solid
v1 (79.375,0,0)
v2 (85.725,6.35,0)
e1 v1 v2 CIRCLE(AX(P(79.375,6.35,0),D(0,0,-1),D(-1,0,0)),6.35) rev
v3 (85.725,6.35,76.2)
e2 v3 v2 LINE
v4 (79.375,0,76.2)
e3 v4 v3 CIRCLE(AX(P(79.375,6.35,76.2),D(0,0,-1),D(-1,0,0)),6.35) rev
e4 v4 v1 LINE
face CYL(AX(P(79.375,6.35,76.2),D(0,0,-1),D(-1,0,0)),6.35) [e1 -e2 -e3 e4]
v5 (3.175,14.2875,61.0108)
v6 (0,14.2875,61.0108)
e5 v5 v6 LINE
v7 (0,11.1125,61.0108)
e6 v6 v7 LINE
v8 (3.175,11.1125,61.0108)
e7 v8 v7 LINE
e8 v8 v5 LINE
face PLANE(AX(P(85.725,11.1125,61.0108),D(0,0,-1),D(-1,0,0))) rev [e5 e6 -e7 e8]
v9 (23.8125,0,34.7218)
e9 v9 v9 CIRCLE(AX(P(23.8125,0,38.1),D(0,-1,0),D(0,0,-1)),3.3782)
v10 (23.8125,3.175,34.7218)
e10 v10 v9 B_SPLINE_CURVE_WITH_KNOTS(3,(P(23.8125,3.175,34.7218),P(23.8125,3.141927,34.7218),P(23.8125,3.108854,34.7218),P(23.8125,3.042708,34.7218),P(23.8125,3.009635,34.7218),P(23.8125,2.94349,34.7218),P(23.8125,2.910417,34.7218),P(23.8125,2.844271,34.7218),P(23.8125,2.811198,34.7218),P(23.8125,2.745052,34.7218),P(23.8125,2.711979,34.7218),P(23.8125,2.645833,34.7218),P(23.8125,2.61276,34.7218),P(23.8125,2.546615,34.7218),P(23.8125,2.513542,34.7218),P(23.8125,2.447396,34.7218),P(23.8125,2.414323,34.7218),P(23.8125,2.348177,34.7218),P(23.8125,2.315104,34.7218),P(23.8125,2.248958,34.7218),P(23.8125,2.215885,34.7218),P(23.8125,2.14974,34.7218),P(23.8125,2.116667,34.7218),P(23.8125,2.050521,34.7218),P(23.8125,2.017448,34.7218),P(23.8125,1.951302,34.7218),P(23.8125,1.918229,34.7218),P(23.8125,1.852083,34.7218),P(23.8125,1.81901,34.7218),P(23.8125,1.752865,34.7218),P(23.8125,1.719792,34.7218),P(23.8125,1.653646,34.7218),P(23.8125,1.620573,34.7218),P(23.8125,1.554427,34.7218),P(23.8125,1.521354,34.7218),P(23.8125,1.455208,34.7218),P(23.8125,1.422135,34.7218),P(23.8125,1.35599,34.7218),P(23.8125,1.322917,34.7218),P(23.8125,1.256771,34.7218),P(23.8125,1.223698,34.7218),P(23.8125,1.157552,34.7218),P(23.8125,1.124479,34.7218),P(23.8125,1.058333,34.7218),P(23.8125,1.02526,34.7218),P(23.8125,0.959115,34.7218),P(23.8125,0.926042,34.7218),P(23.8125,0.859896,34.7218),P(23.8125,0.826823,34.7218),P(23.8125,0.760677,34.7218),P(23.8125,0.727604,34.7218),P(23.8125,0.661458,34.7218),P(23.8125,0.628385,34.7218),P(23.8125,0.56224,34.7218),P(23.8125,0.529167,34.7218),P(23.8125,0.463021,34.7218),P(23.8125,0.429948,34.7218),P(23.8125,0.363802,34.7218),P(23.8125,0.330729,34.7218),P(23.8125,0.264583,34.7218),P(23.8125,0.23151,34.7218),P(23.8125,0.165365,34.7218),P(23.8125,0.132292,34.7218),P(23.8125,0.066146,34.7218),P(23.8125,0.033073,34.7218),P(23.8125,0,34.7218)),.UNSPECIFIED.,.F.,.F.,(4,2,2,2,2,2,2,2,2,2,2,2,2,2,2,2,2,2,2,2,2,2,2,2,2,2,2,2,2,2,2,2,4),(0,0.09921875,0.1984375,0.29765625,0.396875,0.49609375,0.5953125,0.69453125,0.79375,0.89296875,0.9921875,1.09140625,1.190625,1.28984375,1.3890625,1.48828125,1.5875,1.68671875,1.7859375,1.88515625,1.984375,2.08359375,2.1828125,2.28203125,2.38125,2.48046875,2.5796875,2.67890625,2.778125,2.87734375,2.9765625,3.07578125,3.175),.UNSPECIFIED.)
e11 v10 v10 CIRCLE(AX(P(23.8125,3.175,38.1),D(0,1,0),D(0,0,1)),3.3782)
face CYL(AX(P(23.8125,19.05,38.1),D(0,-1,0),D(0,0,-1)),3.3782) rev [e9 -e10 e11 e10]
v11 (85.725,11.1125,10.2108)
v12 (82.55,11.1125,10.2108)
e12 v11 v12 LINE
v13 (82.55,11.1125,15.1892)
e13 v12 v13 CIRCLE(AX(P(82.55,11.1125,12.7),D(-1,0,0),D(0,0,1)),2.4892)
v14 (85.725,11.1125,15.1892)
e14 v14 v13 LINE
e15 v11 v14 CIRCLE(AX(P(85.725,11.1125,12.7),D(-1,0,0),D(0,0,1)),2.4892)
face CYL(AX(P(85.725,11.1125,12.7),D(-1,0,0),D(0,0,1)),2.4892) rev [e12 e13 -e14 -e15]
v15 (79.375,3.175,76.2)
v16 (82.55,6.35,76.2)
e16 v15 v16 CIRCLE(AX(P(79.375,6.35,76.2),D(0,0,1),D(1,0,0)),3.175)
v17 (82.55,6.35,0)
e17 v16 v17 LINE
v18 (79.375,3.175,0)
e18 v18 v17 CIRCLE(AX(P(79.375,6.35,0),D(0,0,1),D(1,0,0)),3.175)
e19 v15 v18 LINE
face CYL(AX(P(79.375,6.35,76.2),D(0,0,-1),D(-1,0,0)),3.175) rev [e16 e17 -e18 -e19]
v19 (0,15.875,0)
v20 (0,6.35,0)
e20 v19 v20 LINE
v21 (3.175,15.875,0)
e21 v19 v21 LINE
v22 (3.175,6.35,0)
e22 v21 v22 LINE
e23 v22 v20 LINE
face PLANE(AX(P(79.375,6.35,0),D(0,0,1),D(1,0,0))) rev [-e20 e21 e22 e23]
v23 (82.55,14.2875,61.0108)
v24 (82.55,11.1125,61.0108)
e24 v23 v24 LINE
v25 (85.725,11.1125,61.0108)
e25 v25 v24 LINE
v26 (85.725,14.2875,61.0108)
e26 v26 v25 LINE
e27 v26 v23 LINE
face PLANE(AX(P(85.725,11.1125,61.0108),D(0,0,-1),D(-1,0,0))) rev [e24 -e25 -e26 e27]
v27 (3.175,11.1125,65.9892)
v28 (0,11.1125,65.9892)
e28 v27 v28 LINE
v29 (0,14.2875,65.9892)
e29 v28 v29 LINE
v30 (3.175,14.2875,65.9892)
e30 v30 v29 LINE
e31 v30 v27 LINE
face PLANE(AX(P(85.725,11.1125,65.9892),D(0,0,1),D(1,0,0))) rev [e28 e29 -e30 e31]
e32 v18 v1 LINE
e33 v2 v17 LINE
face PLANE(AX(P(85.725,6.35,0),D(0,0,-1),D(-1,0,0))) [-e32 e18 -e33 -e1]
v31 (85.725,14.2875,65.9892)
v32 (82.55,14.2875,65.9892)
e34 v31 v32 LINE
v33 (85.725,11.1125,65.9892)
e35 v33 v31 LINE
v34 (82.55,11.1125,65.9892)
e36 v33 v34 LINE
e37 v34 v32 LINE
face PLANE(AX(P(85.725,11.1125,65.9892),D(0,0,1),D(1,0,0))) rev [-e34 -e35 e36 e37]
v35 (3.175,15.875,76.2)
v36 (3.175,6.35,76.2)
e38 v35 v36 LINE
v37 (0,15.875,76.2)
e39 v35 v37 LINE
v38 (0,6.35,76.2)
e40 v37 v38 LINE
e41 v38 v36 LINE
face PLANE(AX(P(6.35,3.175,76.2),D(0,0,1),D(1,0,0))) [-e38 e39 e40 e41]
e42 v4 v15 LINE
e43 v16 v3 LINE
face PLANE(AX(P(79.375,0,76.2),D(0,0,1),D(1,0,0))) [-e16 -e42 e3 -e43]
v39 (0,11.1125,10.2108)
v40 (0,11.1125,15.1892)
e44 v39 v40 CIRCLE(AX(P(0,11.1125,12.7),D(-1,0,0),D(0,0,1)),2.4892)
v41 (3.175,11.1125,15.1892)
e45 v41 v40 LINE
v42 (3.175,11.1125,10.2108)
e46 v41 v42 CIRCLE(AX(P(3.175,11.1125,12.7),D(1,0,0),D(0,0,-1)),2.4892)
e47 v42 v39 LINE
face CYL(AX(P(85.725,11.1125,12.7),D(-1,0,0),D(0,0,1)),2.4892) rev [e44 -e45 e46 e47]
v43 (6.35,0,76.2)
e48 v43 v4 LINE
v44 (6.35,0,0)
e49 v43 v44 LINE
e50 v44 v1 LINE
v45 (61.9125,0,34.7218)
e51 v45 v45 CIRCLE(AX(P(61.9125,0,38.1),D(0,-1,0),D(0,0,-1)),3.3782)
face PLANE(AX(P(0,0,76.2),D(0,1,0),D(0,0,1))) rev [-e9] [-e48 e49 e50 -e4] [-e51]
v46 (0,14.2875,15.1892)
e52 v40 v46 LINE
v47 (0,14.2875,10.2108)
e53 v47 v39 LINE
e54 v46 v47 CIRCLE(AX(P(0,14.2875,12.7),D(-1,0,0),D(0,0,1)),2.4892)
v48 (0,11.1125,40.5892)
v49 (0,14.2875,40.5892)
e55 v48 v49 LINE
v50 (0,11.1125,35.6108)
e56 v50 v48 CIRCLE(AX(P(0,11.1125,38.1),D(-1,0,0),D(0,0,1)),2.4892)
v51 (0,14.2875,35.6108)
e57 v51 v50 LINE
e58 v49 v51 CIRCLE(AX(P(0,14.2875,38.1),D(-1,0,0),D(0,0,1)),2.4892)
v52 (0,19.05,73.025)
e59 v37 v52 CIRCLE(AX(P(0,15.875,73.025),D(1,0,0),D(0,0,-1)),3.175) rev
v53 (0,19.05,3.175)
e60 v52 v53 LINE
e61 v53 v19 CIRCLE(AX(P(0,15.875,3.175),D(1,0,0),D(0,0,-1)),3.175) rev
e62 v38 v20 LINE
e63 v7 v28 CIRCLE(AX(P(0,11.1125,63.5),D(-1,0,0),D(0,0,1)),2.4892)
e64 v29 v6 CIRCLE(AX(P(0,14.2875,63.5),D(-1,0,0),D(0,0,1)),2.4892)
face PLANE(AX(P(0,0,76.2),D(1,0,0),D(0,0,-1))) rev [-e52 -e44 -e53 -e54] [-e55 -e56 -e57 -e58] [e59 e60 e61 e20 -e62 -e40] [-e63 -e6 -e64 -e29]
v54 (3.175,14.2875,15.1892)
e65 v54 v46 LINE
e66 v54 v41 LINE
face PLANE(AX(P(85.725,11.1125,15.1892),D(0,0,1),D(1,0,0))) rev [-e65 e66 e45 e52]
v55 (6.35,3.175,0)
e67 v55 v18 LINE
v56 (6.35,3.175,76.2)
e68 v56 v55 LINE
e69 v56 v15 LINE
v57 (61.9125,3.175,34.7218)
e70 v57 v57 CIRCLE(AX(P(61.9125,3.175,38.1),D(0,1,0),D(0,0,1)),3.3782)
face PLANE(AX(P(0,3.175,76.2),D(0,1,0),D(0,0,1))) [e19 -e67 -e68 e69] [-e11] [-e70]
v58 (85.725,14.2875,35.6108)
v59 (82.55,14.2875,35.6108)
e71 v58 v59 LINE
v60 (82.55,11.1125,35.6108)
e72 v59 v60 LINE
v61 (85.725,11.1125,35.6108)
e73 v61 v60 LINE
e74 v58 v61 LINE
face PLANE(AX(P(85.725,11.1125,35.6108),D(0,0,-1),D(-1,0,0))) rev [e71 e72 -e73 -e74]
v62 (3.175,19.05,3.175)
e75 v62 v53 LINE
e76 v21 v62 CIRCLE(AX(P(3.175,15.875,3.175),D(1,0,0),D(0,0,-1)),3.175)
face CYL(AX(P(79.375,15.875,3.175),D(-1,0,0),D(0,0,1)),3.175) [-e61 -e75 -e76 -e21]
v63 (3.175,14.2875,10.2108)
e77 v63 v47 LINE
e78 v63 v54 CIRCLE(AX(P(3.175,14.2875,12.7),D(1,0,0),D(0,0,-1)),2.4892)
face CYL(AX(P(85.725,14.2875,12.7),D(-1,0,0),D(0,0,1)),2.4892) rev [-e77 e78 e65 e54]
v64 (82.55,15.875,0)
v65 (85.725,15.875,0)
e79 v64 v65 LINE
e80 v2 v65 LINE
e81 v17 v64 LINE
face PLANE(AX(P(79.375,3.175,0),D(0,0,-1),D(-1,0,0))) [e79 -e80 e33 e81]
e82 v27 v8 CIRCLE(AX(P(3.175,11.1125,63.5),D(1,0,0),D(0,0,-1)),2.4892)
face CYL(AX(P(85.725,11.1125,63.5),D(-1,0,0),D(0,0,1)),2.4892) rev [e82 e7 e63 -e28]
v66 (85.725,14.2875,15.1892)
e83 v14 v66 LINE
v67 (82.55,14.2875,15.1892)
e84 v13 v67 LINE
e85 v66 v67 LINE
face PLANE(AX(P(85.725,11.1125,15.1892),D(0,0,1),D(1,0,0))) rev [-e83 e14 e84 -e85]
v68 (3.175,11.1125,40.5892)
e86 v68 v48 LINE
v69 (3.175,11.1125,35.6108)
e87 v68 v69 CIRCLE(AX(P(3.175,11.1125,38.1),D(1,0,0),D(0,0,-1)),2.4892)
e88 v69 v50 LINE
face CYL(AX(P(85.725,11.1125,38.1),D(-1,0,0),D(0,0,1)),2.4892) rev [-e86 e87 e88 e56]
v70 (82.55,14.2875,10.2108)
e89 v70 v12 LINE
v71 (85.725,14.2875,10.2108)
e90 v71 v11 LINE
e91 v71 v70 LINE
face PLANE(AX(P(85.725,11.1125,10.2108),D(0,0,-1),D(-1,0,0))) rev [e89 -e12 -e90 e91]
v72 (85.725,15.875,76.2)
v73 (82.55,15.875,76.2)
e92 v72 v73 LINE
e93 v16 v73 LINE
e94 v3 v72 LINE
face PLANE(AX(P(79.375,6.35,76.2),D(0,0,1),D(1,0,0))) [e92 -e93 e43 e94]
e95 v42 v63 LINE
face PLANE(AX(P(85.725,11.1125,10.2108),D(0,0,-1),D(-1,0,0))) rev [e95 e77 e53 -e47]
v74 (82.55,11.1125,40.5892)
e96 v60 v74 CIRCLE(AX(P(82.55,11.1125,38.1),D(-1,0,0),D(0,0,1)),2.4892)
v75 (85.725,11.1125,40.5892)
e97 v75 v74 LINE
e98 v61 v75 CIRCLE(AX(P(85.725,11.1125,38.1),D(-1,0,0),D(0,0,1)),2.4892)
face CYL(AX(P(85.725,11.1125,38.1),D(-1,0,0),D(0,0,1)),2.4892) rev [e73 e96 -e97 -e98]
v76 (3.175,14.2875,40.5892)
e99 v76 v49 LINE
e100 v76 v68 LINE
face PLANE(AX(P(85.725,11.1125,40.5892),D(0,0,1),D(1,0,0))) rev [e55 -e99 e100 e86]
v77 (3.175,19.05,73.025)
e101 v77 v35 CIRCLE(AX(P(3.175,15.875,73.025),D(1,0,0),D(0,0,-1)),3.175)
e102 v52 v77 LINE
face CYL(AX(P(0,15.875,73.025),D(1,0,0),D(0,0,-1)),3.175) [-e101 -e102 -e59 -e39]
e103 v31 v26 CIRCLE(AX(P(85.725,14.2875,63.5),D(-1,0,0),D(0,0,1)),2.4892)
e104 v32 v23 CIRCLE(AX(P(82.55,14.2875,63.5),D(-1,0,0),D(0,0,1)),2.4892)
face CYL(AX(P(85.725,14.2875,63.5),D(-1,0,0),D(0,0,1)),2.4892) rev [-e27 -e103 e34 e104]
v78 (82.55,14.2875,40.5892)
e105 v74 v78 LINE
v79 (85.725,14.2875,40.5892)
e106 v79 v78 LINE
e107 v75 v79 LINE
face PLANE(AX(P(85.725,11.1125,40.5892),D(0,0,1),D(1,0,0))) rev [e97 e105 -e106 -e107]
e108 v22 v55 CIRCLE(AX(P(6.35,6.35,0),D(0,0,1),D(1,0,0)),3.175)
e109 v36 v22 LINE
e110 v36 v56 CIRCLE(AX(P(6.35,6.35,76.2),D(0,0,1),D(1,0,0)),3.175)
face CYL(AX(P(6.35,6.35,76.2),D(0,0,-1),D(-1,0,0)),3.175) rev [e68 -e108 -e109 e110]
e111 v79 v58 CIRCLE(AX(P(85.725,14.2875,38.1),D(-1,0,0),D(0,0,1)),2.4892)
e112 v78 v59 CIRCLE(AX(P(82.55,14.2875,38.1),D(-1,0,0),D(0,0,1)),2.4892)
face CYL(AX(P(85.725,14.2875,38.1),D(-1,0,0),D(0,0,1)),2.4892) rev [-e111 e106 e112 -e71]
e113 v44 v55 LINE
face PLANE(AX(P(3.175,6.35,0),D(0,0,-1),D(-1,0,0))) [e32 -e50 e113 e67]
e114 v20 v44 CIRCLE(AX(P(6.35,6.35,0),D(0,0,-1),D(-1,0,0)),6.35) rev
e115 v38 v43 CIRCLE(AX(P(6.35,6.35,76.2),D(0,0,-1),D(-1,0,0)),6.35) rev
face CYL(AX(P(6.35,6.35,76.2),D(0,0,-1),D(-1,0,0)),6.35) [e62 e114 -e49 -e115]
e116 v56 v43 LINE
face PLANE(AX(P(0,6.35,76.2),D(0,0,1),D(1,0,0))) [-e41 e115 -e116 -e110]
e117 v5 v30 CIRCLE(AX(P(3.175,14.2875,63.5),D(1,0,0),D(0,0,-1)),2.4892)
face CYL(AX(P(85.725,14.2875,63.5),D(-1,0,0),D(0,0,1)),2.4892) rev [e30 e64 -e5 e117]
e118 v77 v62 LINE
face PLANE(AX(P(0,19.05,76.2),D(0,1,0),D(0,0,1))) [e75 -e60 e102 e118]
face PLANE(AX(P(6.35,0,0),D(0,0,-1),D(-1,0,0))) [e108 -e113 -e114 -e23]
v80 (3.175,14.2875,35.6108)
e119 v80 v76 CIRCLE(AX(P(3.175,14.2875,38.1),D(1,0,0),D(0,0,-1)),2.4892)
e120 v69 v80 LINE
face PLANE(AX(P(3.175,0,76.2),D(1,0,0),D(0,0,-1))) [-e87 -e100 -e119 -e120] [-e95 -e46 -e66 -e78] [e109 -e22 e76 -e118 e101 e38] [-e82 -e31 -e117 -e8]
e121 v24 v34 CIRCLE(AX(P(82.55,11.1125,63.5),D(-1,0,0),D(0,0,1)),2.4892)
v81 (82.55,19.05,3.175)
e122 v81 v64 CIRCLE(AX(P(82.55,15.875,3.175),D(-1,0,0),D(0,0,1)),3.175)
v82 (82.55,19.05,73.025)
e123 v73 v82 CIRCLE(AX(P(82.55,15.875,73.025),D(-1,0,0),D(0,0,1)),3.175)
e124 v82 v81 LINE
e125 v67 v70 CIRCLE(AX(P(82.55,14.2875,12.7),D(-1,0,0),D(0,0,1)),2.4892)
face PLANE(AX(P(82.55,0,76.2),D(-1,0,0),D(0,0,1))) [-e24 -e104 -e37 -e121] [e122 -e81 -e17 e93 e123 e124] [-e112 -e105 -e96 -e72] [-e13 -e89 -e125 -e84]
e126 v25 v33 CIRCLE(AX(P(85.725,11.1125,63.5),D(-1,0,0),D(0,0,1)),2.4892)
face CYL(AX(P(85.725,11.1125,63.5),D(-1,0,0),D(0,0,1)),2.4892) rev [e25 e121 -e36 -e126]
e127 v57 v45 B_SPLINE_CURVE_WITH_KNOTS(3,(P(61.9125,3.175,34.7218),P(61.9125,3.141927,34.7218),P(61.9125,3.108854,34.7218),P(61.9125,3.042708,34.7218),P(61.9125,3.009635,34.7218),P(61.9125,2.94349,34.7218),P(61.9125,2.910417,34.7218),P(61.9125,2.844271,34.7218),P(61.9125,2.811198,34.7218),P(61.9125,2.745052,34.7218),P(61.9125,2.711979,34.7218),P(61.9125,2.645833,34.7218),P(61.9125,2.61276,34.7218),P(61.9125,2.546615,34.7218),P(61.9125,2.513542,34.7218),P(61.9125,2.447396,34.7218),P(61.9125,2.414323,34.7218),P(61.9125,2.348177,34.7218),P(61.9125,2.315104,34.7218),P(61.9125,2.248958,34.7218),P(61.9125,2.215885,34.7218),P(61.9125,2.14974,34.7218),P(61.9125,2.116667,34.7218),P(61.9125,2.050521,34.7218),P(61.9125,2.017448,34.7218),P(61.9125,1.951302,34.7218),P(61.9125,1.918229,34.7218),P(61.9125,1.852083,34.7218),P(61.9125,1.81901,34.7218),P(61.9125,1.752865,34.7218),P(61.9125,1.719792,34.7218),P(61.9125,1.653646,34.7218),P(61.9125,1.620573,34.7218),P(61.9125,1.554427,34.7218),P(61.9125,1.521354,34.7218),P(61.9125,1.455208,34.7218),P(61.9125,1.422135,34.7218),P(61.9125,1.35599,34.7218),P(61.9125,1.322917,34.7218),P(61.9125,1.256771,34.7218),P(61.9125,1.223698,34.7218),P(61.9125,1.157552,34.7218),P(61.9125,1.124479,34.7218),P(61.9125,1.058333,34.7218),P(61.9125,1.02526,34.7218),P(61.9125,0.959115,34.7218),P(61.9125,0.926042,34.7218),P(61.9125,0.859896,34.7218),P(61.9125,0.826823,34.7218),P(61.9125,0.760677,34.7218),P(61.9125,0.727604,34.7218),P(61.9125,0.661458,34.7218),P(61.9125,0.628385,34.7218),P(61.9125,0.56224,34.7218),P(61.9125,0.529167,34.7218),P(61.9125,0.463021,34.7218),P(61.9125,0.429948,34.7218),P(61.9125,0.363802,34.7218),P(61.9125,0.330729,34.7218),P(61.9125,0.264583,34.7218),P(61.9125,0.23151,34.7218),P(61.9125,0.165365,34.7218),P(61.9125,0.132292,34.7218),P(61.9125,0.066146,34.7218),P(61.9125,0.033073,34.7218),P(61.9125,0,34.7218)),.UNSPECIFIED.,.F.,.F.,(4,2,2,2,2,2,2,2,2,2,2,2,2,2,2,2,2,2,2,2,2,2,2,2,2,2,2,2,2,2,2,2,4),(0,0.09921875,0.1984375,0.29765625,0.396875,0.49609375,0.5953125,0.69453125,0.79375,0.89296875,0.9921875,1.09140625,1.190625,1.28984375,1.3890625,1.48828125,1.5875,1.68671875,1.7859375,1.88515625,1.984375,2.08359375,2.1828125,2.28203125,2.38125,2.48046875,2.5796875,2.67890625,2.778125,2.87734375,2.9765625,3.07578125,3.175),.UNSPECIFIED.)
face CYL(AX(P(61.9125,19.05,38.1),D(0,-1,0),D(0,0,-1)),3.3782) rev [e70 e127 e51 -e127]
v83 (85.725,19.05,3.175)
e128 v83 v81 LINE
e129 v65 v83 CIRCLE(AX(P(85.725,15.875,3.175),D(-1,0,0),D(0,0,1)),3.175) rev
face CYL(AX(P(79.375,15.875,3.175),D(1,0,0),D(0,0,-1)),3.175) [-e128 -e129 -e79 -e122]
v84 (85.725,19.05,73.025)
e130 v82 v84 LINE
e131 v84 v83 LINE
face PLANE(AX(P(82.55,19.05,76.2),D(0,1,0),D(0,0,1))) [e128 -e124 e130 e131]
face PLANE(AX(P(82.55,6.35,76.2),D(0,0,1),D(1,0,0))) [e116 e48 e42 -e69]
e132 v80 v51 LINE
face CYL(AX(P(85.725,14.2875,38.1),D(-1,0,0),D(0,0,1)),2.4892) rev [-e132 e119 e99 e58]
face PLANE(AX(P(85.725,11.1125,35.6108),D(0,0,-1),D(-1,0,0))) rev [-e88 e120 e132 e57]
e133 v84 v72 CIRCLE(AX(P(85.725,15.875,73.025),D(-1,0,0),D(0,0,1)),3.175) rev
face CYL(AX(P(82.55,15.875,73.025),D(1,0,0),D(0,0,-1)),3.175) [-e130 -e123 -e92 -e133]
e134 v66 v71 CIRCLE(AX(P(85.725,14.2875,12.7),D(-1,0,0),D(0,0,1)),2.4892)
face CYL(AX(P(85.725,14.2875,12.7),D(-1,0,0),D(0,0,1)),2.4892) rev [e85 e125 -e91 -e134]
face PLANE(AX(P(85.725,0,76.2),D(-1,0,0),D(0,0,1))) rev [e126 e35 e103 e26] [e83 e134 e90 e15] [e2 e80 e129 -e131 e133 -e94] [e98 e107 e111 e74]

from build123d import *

# Parameters (mm, degrees)
BASE_FLANGE1_DEPTH = 76.2
CUT_EXTRUDE1_DEPTH = 117.26744224
SKETCH7_R          = 3.3782
CUT_EXTRUDE2_DEPTH = 117.26744224
FILLET1_R          = 3.175


# Sheet-metal steps are written as plain solids
with BuildPart() as part:
    # Sketch1 → Base-Flange1 (new body)
    with BuildSketch(Plane.XY):
        with BuildLine():
            Line((85.725, 19.05), (85.725, 6.35))
            ThreePointArc((85.725, 6.35), (83.865128061, 1.859871939), (79.375, 0))
            Line((79.375, 0), (6.35, 0))
            ThreePointArc((6.35, 0), (1.859871939, 1.859871939), (0, 6.35))
            Line((0, 6.35), (0, 19.05))
            Line((0, 19.05), (3.175, 19.05))
            Line((3.175, 19.05), (3.175, 6.35))
            ThreePointArc((3.175, 6.35), (4.10493597, 4.10493597), (6.35, 3.175))
            Line((6.35, 3.175), (79.375, 3.175))
            ThreePointArc((79.375, 3.175), (81.62006403, 4.10493597), (82.55, 6.35))
            Line((82.55, 6.35), (82.55, 19.05))
            Line((82.55, 19.05), (85.725, 19.05))
        make_face()
    extrude(amount=BASE_FLANGE1_DEPTH)

    # Sketch6 → Cut-Extrude1 (cut, through all)
    with BuildSketch(Plane.ZY):
        with BuildLine():
            Line((35.6108, 11.1125), (35.6108, 14.2875))
            ThreePointArc((35.6108, 14.2875), (38.1, 16.7767), (40.5892, 14.2875))
            Line((40.5892, 14.2875), (40.5892, 11.1125))
            ThreePointArc((40.5892, 11.1125), (38.1, 8.6233), (35.6108, 11.1125))
        make_face()
        with BuildLine():
            Line((10.2108, 11.1125), (10.2108, 14.2875))
            ThreePointArc((10.2108, 14.2875), (12.7, 16.7767), (15.1892, 14.2875))
            Line((15.1892, 14.2875), (15.1892, 11.1125))
            ThreePointArc((15.1892, 11.1125), (12.7, 8.6233), (10.2108, 11.1125))
        make_face()
        with BuildLine():
            Line((61.0108, 11.1125), (61.0108, 14.2875))
            ThreePointArc((61.0108, 14.2875), (63.5, 16.7767), (65.9892, 14.2875))
            Line((65.9892, 14.2875), (65.9892, 11.1125))
            ThreePointArc((65.9892, 11.1125), (63.5, 8.6233), (61.0108, 11.1125))
        make_face()
    extrude(amount=-CUT_EXTRUDE1_DEPTH, mode=Mode.SUBTRACT)

    # Sketch7 → Cut-Extrude2 (cut, through all)
    with BuildSketch(Plane.XZ):
        with Locations(Location((61.9125, 38.1, 0), (0, 0, 270))):
            Circle(SKETCH7_R)
        with Locations(Location((23.8125, 38.1, 0), (0, 0, 270))):
            Circle(SKETCH7_R)
    extrude(amount=-CUT_EXTRUDE2_DEPTH, mode=Mode.SUBTRACT)

    # Fillet1
    fillet1_edges = [part.edges().sort_by_distance(p)[0] for p in [
        (1.5875, 19.05, 0),
        (84.1375, 19.05, 0),
        (1.5875, 19.05, 76.2),
        (84.1375, 19.05, 76.2),
    ]]
    fillet(fillet1_edges, radius=FILLET1_R)


solid = part.part
